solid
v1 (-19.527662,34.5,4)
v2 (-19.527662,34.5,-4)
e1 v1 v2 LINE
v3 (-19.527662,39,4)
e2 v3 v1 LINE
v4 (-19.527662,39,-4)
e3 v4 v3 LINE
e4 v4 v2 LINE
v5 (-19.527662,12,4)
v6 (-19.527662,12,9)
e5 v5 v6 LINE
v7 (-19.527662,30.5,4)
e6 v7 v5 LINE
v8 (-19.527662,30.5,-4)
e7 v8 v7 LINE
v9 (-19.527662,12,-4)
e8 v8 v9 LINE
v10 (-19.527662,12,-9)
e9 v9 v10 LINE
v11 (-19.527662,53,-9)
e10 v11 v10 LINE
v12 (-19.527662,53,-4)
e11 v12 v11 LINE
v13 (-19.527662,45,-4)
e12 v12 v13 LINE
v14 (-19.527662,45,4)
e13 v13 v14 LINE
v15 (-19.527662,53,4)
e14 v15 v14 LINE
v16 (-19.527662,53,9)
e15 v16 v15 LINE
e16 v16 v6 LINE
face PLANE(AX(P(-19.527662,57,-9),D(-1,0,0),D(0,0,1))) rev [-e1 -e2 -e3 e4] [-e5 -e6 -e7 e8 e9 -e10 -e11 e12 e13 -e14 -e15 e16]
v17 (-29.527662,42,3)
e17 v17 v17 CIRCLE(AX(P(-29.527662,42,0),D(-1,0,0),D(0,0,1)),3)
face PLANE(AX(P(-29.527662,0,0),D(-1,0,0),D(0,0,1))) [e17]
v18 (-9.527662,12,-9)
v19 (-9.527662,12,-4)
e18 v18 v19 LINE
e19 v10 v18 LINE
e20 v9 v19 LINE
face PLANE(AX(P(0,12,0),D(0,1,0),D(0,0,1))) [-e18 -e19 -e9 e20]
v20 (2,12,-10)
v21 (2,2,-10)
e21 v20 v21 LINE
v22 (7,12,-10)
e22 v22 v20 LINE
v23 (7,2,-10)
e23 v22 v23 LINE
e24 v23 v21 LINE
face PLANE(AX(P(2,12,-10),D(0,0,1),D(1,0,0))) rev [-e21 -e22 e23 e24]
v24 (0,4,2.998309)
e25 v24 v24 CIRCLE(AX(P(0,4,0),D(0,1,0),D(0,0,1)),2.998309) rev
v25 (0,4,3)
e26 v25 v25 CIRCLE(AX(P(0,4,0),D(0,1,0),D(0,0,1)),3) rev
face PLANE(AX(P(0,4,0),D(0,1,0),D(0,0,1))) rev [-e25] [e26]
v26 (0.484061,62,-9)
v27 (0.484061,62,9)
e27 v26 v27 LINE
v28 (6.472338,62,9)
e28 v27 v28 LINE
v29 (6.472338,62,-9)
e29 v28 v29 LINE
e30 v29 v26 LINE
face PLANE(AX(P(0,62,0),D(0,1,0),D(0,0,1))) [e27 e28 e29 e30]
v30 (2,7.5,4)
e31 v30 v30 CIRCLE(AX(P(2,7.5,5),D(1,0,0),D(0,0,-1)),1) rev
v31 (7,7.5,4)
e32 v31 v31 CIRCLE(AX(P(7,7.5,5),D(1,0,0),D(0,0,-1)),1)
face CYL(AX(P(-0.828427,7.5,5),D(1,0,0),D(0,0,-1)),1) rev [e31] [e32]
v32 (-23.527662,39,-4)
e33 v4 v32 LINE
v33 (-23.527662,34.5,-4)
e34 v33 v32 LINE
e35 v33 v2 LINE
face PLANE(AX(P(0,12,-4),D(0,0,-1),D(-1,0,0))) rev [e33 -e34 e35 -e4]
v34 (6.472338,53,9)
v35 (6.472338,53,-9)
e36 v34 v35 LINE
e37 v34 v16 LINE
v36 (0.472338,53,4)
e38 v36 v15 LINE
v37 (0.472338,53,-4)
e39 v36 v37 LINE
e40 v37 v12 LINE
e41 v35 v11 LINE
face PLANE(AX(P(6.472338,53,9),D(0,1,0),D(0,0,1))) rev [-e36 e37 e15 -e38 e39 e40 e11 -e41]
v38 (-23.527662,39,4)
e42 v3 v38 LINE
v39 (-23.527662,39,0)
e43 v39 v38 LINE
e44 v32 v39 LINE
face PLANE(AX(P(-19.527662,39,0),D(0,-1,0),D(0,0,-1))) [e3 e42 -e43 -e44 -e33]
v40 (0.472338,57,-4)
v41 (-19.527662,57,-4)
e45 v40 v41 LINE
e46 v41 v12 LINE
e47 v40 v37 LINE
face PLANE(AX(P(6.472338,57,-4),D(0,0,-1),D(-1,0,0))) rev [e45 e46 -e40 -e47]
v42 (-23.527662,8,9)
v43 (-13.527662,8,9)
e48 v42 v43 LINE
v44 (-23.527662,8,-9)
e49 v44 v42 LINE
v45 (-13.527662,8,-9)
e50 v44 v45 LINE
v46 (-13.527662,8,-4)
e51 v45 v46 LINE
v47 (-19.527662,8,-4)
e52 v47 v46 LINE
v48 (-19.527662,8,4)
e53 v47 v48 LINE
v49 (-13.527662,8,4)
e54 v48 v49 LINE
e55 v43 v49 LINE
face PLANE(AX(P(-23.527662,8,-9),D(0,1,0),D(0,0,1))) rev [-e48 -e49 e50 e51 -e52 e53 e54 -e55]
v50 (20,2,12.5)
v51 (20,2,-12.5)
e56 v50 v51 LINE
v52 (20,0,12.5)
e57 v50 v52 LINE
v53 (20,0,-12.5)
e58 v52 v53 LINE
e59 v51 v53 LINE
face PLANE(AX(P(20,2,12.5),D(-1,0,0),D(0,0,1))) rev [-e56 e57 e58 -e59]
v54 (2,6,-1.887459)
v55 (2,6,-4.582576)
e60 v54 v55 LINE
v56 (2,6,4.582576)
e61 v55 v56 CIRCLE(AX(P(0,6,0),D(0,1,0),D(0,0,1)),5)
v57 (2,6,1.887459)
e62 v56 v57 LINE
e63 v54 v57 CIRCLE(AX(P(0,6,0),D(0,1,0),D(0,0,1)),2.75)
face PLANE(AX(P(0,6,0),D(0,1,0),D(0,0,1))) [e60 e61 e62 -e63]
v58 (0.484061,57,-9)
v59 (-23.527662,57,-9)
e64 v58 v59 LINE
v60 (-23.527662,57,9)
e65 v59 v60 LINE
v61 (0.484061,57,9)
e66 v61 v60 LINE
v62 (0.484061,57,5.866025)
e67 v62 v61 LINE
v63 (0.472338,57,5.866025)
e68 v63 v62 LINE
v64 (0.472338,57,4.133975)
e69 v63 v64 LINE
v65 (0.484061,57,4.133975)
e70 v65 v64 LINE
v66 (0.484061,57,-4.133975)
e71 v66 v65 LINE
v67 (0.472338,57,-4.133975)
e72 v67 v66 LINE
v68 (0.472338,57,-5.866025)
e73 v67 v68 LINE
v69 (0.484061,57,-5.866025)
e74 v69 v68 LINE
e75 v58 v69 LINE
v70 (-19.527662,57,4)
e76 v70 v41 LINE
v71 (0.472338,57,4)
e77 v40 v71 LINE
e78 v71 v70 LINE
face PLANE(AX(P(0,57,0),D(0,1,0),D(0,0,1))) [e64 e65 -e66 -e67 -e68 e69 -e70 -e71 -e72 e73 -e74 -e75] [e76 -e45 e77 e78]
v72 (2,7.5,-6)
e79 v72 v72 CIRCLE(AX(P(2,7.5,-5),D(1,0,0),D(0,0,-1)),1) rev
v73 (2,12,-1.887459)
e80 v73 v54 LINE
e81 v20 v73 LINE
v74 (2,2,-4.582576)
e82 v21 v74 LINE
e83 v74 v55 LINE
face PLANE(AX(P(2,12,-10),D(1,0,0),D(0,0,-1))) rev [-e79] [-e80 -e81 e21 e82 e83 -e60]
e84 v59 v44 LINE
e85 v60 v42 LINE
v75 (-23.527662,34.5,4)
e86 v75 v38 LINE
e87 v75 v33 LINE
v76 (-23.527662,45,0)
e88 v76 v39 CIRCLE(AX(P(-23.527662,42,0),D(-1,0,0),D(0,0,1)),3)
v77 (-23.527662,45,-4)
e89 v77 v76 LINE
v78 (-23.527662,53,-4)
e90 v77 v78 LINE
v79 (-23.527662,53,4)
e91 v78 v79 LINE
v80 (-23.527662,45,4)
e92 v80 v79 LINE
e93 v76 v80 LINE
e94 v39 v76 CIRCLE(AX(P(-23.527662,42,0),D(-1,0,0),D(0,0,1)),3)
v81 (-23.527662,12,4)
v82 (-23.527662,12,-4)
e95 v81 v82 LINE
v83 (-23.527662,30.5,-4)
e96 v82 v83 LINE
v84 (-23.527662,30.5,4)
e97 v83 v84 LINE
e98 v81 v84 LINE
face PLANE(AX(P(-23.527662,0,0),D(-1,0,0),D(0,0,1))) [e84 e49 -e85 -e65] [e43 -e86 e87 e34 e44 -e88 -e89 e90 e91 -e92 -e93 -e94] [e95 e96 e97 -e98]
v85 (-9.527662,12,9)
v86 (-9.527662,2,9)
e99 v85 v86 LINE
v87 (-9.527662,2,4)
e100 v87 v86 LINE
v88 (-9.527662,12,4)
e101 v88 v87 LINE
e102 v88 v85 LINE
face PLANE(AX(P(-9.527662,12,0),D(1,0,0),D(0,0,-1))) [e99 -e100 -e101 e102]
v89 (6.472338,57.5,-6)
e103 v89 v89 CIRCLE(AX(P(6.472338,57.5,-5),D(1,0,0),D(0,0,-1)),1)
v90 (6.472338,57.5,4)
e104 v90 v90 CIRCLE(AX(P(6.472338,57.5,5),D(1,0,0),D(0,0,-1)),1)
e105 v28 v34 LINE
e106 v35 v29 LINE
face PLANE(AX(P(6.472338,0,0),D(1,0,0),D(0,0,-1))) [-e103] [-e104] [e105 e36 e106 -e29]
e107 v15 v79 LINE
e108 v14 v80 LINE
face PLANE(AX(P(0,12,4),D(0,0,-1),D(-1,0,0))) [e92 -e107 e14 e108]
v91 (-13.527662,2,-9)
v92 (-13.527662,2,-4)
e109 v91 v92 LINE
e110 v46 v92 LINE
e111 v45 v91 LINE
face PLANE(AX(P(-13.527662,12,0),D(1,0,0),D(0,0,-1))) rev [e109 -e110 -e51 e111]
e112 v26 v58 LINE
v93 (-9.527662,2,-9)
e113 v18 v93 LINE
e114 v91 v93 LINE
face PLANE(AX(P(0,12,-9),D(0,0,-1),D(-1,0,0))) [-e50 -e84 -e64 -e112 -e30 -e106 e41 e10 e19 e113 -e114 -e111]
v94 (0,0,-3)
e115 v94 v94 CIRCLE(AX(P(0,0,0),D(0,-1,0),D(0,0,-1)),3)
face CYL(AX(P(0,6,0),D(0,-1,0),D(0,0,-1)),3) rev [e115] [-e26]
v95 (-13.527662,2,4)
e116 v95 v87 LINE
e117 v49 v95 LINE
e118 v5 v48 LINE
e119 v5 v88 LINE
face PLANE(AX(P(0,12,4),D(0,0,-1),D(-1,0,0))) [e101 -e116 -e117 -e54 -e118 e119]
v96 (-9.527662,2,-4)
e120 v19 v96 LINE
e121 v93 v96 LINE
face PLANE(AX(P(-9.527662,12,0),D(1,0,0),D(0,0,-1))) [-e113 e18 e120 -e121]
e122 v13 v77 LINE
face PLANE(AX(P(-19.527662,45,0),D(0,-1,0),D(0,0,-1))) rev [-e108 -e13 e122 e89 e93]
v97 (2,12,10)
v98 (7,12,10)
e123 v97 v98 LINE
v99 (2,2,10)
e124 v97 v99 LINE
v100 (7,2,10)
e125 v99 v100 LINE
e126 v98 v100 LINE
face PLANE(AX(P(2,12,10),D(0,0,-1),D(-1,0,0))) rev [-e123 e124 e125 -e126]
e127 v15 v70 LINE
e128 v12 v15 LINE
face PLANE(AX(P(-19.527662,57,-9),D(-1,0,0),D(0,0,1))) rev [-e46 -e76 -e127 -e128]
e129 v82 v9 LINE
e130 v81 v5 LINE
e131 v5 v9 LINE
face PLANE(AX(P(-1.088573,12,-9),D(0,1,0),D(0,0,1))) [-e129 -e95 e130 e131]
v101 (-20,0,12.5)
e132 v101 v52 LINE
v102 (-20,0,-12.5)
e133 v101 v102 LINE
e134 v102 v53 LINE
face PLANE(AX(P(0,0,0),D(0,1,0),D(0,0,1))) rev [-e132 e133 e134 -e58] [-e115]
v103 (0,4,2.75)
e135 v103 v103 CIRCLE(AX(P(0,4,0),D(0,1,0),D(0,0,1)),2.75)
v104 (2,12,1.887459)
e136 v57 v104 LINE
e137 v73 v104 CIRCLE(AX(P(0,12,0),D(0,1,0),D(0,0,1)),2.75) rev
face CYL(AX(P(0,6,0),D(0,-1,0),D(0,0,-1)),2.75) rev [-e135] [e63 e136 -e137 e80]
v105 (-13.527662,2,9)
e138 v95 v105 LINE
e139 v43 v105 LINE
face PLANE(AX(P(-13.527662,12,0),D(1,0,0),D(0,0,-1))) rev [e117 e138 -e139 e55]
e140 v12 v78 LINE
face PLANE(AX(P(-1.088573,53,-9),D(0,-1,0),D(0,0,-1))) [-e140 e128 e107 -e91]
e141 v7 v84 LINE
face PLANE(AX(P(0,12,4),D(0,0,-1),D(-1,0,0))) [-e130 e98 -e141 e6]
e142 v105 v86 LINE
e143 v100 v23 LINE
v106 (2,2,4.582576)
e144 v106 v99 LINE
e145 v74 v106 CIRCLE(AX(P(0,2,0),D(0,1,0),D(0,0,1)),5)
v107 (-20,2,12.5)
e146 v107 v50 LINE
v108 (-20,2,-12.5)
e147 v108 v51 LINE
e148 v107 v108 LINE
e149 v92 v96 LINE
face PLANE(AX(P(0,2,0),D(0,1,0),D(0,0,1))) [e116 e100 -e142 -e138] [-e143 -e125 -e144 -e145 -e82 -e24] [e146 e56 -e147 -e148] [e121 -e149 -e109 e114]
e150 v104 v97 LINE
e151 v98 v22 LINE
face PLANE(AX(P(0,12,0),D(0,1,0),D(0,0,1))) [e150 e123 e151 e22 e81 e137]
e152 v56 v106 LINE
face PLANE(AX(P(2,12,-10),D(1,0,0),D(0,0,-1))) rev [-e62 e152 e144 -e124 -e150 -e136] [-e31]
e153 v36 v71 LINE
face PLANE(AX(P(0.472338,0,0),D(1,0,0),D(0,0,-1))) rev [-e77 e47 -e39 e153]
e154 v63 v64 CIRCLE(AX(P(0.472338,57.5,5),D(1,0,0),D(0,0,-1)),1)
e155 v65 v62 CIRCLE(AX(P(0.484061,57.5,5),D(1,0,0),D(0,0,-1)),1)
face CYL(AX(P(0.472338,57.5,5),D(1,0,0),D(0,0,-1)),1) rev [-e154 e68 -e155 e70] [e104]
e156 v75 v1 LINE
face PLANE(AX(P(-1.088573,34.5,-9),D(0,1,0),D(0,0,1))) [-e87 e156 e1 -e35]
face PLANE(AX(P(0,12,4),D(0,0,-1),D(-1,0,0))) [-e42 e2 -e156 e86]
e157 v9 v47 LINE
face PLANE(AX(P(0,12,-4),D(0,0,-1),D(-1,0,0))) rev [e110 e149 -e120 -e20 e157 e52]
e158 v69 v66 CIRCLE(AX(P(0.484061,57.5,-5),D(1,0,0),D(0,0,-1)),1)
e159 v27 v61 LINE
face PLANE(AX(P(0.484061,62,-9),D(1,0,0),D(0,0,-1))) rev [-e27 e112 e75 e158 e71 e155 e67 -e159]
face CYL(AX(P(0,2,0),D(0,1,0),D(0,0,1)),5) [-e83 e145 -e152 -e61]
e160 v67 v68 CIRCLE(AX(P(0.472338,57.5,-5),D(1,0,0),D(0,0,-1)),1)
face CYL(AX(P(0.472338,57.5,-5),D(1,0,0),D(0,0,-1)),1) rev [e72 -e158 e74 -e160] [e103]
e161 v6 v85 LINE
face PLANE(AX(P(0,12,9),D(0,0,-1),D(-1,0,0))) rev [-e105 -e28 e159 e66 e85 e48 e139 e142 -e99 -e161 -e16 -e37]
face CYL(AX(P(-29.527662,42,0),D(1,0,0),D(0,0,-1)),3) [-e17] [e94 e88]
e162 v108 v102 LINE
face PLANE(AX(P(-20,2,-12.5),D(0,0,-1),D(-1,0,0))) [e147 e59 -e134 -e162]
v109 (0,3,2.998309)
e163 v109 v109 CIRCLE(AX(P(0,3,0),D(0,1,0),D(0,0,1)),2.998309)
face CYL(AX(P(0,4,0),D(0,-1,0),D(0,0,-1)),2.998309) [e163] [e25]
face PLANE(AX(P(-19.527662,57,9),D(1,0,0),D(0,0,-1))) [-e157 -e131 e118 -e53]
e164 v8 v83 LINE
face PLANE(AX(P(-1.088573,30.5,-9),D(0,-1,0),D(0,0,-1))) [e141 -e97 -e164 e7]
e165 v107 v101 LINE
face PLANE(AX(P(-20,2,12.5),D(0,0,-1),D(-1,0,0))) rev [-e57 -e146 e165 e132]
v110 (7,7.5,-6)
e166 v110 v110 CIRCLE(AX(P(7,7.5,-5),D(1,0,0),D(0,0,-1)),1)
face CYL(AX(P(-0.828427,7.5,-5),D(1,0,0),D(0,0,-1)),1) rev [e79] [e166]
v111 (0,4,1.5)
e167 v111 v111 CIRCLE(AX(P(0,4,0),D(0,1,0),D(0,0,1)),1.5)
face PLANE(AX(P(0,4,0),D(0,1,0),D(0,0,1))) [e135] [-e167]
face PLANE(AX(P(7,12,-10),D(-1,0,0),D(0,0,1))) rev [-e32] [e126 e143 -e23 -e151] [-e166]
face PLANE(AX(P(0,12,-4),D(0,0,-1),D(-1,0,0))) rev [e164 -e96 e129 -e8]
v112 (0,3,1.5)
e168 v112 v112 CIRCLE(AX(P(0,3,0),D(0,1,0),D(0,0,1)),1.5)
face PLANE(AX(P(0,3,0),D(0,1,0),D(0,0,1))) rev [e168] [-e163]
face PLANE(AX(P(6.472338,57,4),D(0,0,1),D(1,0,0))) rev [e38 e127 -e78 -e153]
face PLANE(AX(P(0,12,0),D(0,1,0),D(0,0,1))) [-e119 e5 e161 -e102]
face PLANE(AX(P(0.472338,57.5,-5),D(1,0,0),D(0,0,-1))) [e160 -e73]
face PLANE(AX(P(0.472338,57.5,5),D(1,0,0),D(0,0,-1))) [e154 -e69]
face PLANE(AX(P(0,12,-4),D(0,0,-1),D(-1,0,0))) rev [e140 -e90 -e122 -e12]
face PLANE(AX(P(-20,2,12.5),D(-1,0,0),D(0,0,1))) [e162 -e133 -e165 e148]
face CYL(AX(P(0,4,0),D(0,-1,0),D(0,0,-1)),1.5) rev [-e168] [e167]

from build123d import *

# Parameters (mm, degrees)
SKETCH1_W                  = 40
SKETCH1_H                  = 25
BOSS_EXTRUDE1_DEPTH        = 2
SKETCH2_W                  = 5
SKETCH2_H                  = 20
BOSS_EXTRUDE2_DEPTH        = 10
SKETCH4_W                  = 19.965035534
SKETCH4_H                  = 6
BOSS_EXTRUDE3_DEPTH        = 5
SKETCH5_R                  = 1
CUT_EXTRUDE2_DEPTH         = 5
SKETCH6_W                  = 4
SKETCH6_H                  = 5
BOSS_EXTRUDE4_DEPTH        = 10
SKETCH8_W                  = 5
SKETCH8_H                  = 4
BOSS_EXTRUDE5_DEPTH        = 10
SKETCH9_W                  = 4
SKETCH9_H                  = 5
BOSS_EXTRUDE6_DEPTH        = 45
SKETCH12_W                 = 18
SKETCH12_H                 = 4
BOSS_EXTRUDE8_DEPTH        = 4
SKETCH13_W                 = 5
SKETCH13_H                 = 4
BOSS_EXTRUDE9_DEPTH        = 26
SKETCH14_W                 = 18
SKETCH14_H                 = 4
BOSS_EXTRUDE10_DEPTH       = 6
SKETCH16_W                 = 5.988277512
SKETCH16_H                 = 18
BOSS_EXTRUDE11_DEPTH       = 5
SKETCH15_R                 = 1
CUT_EXTRUDE3_DEPTH         = 6
SKETCH17_R                 = 3
CUT_EXTRUDE5_DEPTH         = 6
SKETCH24_R                 = 3
BOSS_EXTRUDE18_DEPTH       = 4
SKETCH24_4_R               = 3
BOSS_EXTRUDE19_DEPTH       = 6
BOSS_EXTRUDE20_START       = -1
SKETCH20_R                 = 5
SKETCH20_R_2               = 3
BOSS_EXTRUDE20_DEPTH       = 1
BOSS_EXTRUDE21_OUTLINE_R   = 2.998308623
BOSS_EXTRUDE21_OUTLINE_R_2 = 1.5
BOSS_EXTRUDE21_DEPTH       = 1
SKETCH27_R                 = 5
SKETCH27_R_2               = 2.75
BOSS_EXTRUDE22_DEPTH       = 2
SKETCH28_R                 = 2.75
CUT_EXTRUDE10_DEPTH        = 10


# Read off the part's stored shape, not the designer's step: Boss-Extrude21
with BuildPart() as part:
    # Sketch1 → Boss-Extrude1 (new body)
    with BuildSketch(Plane(origin=(0, 0, 0), x_dir=(1, 0, 0), z_dir=(0, 1, 0))):
        Rectangle(SKETCH1_W, SKETCH1_H)
    extrude(amount=BOSS_EXTRUDE1_DEPTH)

    # Sketch2 → Boss-Extrude2 (add)
    with BuildSketch(Plane(origin=(0, 2, 0), x_dir=(1, 0, 0), z_dir=(0, 1, 0))):
        with Locations((4.5, 0)):
            Rectangle(SKETCH2_W, SKETCH2_H)
    extrude(amount=BOSS_EXTRUDE2_DEPTH)

    # Sketch4 → Boss-Extrude3 (add)
    with BuildSketch(Plane(origin=(7, 0, 0), x_dir=(0, 0, -1), z_dir=(1, 0, 0))):
        with Locations((-0.017482233, 9)):
            Rectangle(SKETCH4_W, SKETCH4_H)
    extrude(amount=-BOSS_EXTRUDE3_DEPTH)

    # Sketch5 → Cut-Extrude2 (cut)
    with BuildSketch(Plane(origin=(7, 0, 0), x_dir=(0, 0, -1), z_dir=(1, 0, 0))):
        with Locations((5, 7.5)):
            Circle(SKETCH5_R)
        with Locations((-5, 7.5)):
            Circle(SKETCH5_R)
    extrude(amount=-CUT_EXTRUDE2_DEPTH, mode=Mode.SUBTRACT)

    # Sketch6 → Boss-Extrude4 (add)
    with BuildSketch(Plane(origin=(0, 2, 0), x_dir=(1, 0, 0), z_dir=(0, 1, 0))):
        with Locations((-11.527661753, -6.5)):
            Rectangle(SKETCH6_W, SKETCH6_H)
        with Locations((-11.527661753, 6.5)):
            Rectangle(SKETCH6_W, SKETCH6_H)
    extrude(amount=BOSS_EXTRUDE4_DEPTH)

    # Sketch8 → Boss-Extrude5 (add)
    with BuildSketch(Plane.ZY.offset(13.527661753)):
        with Locations((-6.5, 10)):
            Rectangle(SKETCH8_W, SKETCH8_H)
    boss_extrude5 = extrude(amount=BOSS_EXTRUDE5_DEPTH)

    # Mirror1: Boss-Extrude5 across plane
    add(boss_extrude5.mirror(Plane(origin=(0, 0, 0), x_dir=(1, 0, 0), z_dir=(0, 0, -1))))

    # Sketch9 → Boss-Extrude6 (add)
    with BuildSketch(Plane(origin=(0, 12, 0), x_dir=(1, 0, 0), z_dir=(0, 1, 0))):
        with Locations((-21.527661753, 6.5)):
            Rectangle(SKETCH9_W, SKETCH9_H)
    boss_extrude6 = extrude(amount=BOSS_EXTRUDE6_DEPTH)

    # Mirror2: Boss-Extrude5 across plane
    add(boss_extrude5.mirror(Plane(origin=(0, 0, 0), x_dir=(1, 0, 0), z_dir=(0, 0, -1))))

    # Mirror3: Boss-Extrude6 across plane
    add(boss_extrude6.mirror(Plane(origin=(0, 0, 0), x_dir=(1, 0, 0), z_dir=(0, 0, -1))))

    # Sketch12 → Boss-Extrude8 (add)
    with BuildSketch(Plane.ZY.offset(23.527661753)):
        with Locations((0, 55)):
            Rectangle(SKETCH12_W, SKETCH12_H)
        with Locations((0, 10)):
            Rectangle(SKETCH12_W, SKETCH12_H)
        with Locations((0, 32.5)):
            Rectangle(SKETCH12_W, SKETCH12_H)
    extrude(amount=-BOSS_EXTRUDE8_DEPTH)

    # Sketch13 → Boss-Extrude9 (add)
    with BuildSketch(Plane(origin=(-19.527661753, 0, 0), x_dir=(0, 0, -1), z_dir=(1, 0, 0))):
        with Locations((-6.5, 55)):
            Rectangle(SKETCH13_W, SKETCH13_H)
        with Locations((6.5, 55)):
            Rectangle(SKETCH13_W, SKETCH13_H)
    extrude(amount=BOSS_EXTRUDE9_DEPTH)

    # Sketch14 → Boss-Extrude10 (add)
    with BuildSketch(Plane(origin=(6.472338247, 0, 0), x_dir=(0, 0, -1), z_dir=(1, 0, 0))):
        with Locations((0, 55)):
            Rectangle(SKETCH14_W, SKETCH14_H)
    extrude(amount=-BOSS_EXTRUDE10_DEPTH)

    # Sketch16 → Boss-Extrude11 (add)
    with BuildSketch(Plane(origin=(0, 57, 0), x_dir=(1, 0, 0), z_dir=(0, 1, 0))):
        with Locations((3.478199491, 0)):
            Rectangle(SKETCH16_W, SKETCH16_H)
    extrude(amount=BOSS_EXTRUDE11_DEPTH)

    # Sketch15 → Cut-Extrude3 (cut)
    with BuildSketch(Plane(origin=(6.472338247, 0, 0), x_dir=(0, 0, -1), z_dir=(1, 0, 0))):
        with Locations((-5, 57.5)):
            Circle(SKETCH15_R)
        with Locations((5, 57.5)):
            Circle(SKETCH15_R)
    extrude(amount=-CUT_EXTRUDE3_DEPTH, mode=Mode.SUBTRACT)

    # Sketch17 → Cut-Extrude5 (cut)
    with BuildSketch(Plane.XZ):
        with Locations(Location((0, 0, 0), (0, 0, 270))):
            Circle(SKETCH17_R)
    extrude(amount=-CUT_EXTRUDE5_DEPTH, mode=Mode.SUBTRACT)

    # Sketch24 → Boss-Extrude18 (add)
    with BuildSketch(Plane.ZY.offset(23.527661753)):
        with Locations((0, 42)):
            Circle(SKETCH24_R)
        with BuildLine():
            Line((-4, 45), (-4, 39))
            Line((-4, 39), (0, 39))
            ThreePointArc((0, 39), (-3, 42.000000012), (2.4e-08, 45))
            Line((2.4e-08, 45), (-4, 45))
        make_face()
        with BuildLine():
            ThreePointArc((3, 42), (2.121320344, 39.878679656), (0, 39))
            Line((0, 39), (4, 39))
            Line((4, 39), (4, 45))
            Line((4, 45), (2.4e-08, 45))
            ThreePointArc((2.4e-08, 45), (2.121320352, 44.121320335), (3, 42))
        make_face()
    extrude(amount=-BOSS_EXTRUDE18_DEPTH)

    # Sketch24<4> → Boss-Extrude19 (add)
    with BuildSketch(Plane.ZY.offset(23.527661753)):
        with Locations(Location((0, 42, 0), (0, 0, 270))):
            Circle(SKETCH24_4_R)
    extrude(amount=BOSS_EXTRUDE19_DEPTH)

    # Sketch20 → Boss-Extrude20 (add)
    with BuildSketch(Plane(origin=(0, 3, 0), x_dir=(1, 0, 0), z_dir=(0, 1, 0)).offset(BOSS_EXTRUDE20_START)):
        Circle(SKETCH20_R)
        with Locations(Location((0, 0, 0), (0, 0, 90))):
            Circle(SKETCH20_R_2, mode=Mode.SUBTRACT)
    extrude(amount=BOSS_EXTRUDE20_DEPTH)

    # Boss-Extrude21 outline → Boss-Extrude21 (add)
    # profile 1 of 2: a face of its own
    with BuildSketch(Plane(origin=(0, 3, 0), x_dir=(1, 0, 0), z_dir=(0, 1, 0))):
        with BuildLine():
            ThreePointArc((2, -2.236067977), (-3, 0), (2, 2.236067977))
            Line((2, 2.236067977), (2, 4.582575695))
            ThreePointArc((2, 4.582575695), (-5, 0), (2, -4.582575695))
            Line((2, -4.582575695), (2, -2.236067977))
        make_face()
    # profile 2 of 2: a face of its own
    with BuildSketch(Plane(origin=(0, 3, 0), x_dir=(1, 0, 0), z_dir=(0, 1, 0))):
        Circle(BOSS_EXTRUDE21_OUTLINE_R)
        Circle(BOSS_EXTRUDE21_OUTLINE_R_2, mode=Mode.SUBTRACT)
    extrude(amount=BOSS_EXTRUDE21_DEPTH)

    # Sketch27 → Boss-Extrude22 (add)
    with BuildSketch(Plane(origin=(0, 4, 0), x_dir=(1, 0, 0), z_dir=(0, 1, 0))):
        Circle(SKETCH27_R)
        with Locations(Location((0, 0, 0), (0, 0, 43.341758227))):
            Circle(SKETCH27_R_2, mode=Mode.SUBTRACT)
    extrude(amount=BOSS_EXTRUDE22_DEPTH)

    # Sketch28 → Cut-Extrude10 (cut)
    with BuildSketch(Plane(origin=(0, 6, 0), x_dir=(1, 0, 0), z_dir=(0, 1, 0))):
        with Locations(Location((0, 0, 0), (0, 0, 43.341758227))):
            Circle(SKETCH28_R)
    extrude(amount=CUT_EXTRUDE10_DEPTH, mode=Mode.SUBTRACT)


solid = part.part
